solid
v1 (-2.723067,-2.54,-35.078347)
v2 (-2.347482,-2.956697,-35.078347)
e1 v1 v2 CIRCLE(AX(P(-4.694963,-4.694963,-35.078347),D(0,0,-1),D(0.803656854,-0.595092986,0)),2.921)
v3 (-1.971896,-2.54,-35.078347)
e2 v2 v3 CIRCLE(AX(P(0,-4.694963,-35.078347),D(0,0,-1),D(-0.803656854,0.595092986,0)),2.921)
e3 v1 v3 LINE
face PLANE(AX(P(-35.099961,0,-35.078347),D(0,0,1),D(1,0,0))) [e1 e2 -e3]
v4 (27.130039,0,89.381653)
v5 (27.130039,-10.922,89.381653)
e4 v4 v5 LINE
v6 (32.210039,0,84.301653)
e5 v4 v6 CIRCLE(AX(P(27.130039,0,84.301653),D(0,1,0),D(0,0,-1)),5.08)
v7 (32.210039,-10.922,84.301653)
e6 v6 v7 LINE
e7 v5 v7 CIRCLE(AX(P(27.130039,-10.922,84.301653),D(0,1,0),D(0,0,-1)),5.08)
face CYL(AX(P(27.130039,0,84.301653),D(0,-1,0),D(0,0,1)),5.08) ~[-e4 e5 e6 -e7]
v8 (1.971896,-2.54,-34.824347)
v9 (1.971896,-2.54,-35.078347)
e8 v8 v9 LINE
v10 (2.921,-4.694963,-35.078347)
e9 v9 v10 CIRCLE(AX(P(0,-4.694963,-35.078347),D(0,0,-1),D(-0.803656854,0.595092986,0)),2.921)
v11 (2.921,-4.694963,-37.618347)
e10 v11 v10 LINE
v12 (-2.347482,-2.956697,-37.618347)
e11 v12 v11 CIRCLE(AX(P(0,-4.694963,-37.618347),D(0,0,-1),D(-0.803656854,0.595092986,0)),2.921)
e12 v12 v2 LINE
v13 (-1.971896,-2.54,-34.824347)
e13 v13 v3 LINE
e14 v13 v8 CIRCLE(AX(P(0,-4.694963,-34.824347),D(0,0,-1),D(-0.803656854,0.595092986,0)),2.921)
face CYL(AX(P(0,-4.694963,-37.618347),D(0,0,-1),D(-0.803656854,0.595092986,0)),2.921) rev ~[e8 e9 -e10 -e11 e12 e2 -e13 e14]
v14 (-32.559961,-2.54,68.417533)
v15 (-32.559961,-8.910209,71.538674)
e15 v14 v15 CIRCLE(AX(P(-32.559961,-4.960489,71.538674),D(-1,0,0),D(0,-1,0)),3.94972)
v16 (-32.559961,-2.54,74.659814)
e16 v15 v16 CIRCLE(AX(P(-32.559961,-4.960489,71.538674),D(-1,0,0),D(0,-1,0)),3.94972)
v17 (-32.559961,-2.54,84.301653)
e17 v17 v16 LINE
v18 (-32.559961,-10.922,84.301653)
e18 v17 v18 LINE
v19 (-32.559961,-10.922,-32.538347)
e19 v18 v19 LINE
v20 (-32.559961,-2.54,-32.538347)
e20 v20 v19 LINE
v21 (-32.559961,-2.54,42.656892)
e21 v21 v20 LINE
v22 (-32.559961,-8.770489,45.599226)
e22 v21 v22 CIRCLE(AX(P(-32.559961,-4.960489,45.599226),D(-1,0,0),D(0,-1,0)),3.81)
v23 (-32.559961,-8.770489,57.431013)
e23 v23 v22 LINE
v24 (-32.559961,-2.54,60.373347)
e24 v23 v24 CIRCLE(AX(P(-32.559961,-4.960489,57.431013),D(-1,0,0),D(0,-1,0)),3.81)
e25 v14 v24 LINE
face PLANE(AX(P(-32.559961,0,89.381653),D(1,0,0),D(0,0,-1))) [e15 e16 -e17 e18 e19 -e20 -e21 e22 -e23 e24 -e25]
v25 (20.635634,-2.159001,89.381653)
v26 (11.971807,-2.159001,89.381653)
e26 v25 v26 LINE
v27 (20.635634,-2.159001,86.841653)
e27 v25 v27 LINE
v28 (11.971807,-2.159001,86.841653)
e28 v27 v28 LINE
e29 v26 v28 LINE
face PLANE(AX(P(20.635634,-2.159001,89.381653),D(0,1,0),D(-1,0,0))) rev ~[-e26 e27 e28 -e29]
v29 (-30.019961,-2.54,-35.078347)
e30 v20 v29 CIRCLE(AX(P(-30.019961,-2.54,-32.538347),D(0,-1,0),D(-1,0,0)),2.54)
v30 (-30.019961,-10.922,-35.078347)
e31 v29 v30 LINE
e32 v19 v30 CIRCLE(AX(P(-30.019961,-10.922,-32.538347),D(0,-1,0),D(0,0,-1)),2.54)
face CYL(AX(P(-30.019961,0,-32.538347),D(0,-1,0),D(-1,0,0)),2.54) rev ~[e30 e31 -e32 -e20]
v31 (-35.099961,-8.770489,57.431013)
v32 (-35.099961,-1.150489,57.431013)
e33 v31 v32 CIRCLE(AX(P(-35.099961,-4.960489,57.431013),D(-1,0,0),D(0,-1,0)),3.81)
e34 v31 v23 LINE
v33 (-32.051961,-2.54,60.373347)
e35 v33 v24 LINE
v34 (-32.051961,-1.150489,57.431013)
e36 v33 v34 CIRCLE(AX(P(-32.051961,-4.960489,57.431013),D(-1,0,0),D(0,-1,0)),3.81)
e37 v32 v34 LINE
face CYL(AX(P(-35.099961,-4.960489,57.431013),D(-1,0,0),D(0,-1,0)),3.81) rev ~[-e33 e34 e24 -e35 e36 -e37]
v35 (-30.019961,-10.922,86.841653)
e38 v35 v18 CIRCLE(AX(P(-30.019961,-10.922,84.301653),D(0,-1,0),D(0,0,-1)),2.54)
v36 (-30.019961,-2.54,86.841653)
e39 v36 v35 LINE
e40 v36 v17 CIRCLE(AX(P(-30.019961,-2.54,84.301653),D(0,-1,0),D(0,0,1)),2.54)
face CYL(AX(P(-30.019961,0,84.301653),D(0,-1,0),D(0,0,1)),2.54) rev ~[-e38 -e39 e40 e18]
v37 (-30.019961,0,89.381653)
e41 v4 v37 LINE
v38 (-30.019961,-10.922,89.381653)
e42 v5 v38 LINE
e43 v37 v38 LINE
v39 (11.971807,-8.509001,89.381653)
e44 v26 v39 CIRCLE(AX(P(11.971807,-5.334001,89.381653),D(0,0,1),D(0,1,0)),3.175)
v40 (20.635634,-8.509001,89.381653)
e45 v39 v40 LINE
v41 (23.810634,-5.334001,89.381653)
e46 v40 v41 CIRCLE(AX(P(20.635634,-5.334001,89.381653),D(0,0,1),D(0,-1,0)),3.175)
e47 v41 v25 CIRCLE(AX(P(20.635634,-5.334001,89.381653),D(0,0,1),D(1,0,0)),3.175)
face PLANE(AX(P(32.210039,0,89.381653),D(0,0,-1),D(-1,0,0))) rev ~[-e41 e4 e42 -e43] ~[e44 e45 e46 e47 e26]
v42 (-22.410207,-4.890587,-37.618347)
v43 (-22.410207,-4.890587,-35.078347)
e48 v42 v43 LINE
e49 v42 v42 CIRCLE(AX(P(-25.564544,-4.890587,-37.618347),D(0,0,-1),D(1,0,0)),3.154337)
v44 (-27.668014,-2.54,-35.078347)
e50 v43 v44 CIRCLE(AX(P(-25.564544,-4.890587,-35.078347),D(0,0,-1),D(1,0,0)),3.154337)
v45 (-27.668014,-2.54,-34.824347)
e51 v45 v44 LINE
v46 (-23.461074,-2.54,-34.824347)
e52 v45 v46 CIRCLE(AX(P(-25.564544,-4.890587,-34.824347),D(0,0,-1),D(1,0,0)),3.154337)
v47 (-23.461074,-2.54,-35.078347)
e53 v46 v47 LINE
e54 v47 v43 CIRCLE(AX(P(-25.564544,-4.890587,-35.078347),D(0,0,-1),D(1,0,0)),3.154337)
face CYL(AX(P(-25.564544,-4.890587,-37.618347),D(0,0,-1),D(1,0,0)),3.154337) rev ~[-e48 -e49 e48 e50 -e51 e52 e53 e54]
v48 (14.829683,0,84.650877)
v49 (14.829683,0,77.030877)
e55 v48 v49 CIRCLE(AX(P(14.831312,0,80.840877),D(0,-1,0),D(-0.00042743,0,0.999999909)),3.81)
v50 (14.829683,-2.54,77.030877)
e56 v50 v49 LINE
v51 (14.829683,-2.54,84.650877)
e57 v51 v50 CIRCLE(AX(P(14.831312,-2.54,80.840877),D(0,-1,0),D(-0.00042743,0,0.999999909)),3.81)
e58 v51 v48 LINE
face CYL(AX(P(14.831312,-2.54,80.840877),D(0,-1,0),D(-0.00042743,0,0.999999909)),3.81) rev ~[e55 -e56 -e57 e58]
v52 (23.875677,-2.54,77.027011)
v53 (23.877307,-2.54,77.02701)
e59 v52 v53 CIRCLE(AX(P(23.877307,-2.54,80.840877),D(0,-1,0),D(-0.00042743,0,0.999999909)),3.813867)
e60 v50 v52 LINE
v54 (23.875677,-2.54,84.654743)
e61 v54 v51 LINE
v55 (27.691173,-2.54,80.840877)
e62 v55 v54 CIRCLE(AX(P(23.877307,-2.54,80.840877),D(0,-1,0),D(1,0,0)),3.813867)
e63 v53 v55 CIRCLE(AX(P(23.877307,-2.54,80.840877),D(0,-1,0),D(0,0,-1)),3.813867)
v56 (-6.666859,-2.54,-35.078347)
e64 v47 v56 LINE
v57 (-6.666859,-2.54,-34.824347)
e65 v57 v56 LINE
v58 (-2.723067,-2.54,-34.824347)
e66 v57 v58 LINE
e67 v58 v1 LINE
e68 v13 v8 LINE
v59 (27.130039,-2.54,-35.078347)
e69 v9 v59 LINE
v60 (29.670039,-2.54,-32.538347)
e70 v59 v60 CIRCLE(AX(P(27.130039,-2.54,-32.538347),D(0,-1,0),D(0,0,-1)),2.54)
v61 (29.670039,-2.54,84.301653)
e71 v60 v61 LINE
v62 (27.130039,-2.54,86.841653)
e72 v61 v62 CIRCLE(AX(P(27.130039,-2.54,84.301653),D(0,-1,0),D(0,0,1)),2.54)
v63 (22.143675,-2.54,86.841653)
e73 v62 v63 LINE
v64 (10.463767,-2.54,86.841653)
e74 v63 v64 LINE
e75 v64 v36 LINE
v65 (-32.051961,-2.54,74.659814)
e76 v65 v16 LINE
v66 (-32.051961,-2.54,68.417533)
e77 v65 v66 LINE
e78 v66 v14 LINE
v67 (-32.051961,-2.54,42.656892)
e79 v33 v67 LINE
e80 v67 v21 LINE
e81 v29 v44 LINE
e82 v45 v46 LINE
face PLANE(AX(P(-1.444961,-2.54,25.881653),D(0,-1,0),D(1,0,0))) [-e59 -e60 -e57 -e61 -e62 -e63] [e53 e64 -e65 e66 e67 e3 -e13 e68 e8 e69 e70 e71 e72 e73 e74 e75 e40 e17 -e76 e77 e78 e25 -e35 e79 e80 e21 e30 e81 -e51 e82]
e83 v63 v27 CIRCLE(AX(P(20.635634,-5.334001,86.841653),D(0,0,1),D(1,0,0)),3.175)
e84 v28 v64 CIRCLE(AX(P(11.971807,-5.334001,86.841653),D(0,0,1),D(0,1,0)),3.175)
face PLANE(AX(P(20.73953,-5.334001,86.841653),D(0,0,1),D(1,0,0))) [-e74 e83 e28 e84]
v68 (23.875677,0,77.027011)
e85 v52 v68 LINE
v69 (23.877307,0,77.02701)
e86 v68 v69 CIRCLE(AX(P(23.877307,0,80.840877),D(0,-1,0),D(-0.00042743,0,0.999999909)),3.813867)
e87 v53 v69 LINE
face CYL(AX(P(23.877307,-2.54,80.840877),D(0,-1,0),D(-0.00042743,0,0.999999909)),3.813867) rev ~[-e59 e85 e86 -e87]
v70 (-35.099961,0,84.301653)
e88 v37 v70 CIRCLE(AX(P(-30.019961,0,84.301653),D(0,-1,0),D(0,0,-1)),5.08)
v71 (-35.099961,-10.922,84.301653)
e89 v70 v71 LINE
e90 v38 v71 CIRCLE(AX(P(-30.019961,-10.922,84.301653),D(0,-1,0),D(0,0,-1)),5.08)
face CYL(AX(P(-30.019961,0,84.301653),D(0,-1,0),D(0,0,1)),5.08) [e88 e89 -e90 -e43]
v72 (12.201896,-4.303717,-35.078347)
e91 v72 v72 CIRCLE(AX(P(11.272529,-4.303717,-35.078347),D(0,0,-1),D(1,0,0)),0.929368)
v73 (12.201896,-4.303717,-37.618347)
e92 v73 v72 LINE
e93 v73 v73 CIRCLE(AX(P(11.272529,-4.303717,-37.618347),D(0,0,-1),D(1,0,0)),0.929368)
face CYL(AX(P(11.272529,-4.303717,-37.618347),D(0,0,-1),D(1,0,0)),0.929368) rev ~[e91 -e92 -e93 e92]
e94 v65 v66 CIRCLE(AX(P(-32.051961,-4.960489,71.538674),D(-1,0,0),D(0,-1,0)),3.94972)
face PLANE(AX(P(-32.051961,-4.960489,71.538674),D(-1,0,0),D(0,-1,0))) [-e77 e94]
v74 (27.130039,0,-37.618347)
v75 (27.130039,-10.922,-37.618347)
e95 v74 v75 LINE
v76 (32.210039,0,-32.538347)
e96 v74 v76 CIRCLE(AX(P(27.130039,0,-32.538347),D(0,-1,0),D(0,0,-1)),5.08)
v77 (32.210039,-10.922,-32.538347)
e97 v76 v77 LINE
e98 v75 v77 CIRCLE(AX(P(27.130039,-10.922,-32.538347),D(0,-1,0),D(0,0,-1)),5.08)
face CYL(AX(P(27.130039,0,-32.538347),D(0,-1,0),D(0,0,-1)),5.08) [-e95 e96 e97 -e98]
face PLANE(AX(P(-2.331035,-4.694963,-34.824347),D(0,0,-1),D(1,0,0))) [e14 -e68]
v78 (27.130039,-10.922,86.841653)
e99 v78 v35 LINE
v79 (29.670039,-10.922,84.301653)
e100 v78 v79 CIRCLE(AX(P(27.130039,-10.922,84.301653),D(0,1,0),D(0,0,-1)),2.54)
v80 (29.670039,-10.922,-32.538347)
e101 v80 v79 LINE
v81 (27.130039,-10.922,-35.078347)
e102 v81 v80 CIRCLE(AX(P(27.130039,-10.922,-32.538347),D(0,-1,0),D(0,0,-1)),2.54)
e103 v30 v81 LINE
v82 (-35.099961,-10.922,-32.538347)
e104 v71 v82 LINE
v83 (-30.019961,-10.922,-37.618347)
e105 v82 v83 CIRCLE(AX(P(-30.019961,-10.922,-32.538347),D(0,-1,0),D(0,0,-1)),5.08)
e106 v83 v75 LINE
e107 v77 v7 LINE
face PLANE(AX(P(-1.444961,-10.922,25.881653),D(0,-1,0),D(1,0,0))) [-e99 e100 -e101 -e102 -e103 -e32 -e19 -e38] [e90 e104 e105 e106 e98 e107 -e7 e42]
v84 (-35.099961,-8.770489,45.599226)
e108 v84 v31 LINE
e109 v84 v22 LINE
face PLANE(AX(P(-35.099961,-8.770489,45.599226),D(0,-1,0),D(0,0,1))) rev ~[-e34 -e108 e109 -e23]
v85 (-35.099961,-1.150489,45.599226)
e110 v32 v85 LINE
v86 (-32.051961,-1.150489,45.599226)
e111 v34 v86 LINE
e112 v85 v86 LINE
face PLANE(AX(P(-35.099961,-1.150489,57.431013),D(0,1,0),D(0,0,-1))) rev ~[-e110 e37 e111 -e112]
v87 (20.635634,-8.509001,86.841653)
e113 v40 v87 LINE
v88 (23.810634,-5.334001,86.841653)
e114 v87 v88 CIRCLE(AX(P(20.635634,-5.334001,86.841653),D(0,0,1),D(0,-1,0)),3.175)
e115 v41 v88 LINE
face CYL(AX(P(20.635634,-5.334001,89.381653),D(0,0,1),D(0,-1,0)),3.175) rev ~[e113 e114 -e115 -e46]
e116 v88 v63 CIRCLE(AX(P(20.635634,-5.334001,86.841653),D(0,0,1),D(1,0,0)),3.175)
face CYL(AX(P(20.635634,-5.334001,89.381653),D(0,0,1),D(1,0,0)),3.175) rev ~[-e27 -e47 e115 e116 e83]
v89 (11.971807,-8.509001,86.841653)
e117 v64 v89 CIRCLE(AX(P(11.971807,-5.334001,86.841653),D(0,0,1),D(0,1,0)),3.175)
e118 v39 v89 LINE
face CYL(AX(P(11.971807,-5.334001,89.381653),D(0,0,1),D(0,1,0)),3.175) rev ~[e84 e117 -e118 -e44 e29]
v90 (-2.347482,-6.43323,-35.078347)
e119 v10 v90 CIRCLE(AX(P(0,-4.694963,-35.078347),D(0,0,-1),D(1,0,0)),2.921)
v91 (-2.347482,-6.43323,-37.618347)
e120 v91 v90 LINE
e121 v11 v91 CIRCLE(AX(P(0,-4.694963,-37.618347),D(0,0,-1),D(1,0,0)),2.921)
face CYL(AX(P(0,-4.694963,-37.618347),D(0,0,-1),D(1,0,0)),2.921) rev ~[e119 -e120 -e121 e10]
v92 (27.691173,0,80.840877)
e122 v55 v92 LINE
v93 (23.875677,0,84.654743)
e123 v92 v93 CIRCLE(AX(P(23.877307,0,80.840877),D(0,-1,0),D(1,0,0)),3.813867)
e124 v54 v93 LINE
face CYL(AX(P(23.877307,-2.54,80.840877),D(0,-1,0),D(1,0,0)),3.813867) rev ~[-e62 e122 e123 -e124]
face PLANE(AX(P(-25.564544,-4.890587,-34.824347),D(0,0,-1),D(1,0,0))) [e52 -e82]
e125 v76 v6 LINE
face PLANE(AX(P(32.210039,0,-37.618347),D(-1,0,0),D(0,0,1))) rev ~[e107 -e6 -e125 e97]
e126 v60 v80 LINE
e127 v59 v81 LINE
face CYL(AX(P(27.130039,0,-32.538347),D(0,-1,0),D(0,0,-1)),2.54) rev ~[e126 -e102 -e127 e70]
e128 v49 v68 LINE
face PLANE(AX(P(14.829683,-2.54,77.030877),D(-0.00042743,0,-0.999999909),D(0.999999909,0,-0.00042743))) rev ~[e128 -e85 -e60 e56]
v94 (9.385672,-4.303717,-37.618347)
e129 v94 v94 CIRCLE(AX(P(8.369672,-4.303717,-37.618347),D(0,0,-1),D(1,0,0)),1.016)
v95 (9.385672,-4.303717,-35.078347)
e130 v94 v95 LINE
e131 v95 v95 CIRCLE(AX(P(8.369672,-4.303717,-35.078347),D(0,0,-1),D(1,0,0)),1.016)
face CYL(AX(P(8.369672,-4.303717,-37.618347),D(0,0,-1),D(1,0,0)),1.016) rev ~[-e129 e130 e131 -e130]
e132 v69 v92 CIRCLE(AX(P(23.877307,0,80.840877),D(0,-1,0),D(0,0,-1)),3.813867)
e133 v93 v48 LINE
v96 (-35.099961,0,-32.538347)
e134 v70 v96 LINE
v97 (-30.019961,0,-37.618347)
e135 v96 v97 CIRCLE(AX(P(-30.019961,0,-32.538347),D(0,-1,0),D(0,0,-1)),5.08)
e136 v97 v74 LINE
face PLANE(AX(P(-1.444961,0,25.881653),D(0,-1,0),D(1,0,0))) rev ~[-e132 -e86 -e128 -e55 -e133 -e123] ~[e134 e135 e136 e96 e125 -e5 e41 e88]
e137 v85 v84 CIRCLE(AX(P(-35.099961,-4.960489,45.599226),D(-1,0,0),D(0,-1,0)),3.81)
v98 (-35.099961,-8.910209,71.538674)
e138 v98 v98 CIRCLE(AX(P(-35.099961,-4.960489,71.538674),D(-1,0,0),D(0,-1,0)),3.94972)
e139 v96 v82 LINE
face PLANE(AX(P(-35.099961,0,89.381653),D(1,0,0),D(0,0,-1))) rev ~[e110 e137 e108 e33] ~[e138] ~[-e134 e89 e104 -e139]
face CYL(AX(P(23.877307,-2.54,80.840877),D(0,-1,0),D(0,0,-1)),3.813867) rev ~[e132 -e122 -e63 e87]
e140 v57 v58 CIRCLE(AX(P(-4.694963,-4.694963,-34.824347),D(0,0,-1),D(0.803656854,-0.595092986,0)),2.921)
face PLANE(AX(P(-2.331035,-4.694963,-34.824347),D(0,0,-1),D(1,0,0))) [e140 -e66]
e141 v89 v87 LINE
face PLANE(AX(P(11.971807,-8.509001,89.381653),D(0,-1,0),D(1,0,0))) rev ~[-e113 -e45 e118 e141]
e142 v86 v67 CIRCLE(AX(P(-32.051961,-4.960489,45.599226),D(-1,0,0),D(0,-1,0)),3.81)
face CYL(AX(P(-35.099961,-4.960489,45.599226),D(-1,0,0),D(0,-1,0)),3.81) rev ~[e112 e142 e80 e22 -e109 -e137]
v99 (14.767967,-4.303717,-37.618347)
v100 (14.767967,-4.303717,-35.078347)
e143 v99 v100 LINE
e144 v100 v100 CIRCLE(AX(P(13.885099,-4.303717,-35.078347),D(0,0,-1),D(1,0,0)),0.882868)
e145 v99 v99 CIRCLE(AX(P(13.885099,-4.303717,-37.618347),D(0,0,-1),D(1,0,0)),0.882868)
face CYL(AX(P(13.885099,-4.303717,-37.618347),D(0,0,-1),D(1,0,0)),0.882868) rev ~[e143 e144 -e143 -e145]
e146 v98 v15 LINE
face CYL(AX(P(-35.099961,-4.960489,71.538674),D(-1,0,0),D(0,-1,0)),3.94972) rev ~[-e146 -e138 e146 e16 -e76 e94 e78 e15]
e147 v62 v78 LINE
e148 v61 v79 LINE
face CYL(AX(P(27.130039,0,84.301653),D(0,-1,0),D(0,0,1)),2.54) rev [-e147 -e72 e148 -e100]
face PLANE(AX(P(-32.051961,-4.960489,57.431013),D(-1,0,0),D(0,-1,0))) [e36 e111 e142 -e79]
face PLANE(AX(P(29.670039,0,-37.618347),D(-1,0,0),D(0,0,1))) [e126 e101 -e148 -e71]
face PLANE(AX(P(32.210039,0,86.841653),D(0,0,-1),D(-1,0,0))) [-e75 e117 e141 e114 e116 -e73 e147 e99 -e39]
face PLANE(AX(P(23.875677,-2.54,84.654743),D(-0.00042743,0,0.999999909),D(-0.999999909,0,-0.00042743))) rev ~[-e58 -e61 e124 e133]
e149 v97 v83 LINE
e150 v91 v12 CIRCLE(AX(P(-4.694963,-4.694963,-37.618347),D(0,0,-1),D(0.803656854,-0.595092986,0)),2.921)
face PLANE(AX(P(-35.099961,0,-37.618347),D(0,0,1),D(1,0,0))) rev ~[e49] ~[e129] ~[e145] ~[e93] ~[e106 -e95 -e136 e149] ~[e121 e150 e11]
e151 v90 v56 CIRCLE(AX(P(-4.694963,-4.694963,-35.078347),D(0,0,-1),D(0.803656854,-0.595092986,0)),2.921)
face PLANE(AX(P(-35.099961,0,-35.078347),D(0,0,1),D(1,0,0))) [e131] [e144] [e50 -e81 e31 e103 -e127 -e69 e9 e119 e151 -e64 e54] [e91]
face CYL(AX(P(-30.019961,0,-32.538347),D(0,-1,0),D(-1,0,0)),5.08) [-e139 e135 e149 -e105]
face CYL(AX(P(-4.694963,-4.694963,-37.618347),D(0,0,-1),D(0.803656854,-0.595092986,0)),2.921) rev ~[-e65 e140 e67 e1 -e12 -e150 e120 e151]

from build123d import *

# Parameters (mm, degrees)
F1_DEPTH  = 10.922
F2_R      = 5.08
F3_T      = -2.54
F5_R      = 0.8828675693
F5_R_2    = 0.9293675191
F5_R_3    = 1.016
F5_R_4    = 3.1543371167
F6_DEPTH  = 2.794
F7_R      = 3.9497200101
F8_DEPTH  = 3.048
F10_DEPTH = 2.54
F11_DEPTH = 25.4
F12_DEPTH = 42.418
F13_DEPTH = 25.4
F14_DEPTH = 2.54


# Not quite as in the source:
# - ends of sketch curves that miss each other by under 0.0002 mm in the source are joined


with BuildPart() as f1:
    # F0 (on Front) → F1 (new body)
    with BuildSketch(Plane.XZ):
        Polygon((32.2100387361, 89.3816531977), (0, 89.3816531977), (-35.0999612639, 89.3816531977), (-35.0999612639, -37.6183468023), (32.2100387361, -37.6183468023), align=None)
    extrude(amount=F1_DEPTH)

    # F2
    f2_edges = [f1.edges().sort_by_distance(p)[0] for p in [
        (-35.099961, -5.461, 89.381653),
        (32.210039, -5.461, 89.381653),
        (32.210039, -5.461, -37.618347),
        (-35.099961, -5.461, -37.618347),
    ]]
    fillet(f2_edges, radius=F2_R)

    # F3
    f3_openings = [f1.faces().sort_by_distance(p)[0] for p in [
        (-1.444961, -10.922, 25.881653),
    ]]
    offset(amount=F3_T, openings=f3_openings)

    # F5 (on face) → F6 (cut)
    with BuildSketch(Plane(origin=(0, 0, -37.6183468023), x_dir=(1, 0, 0), z_dir=(0, 0, -1))):
        with Locations((13.885099197, 4.3037165888)):
            Circle(F5_R)
        with Locations((11.2725288543, 4.3037165888)):
            Circle(F5_R_2)
        with Locations((8.3696719582, 4.3037165888)):
            Circle(F5_R_3)
        with BuildLine():
            ThreePointArc((-2.3474816699, 2.9566967291), (-1.9210459872, 3.7797455945), (-1.7739633397, 4.6949633397))
            ThreePointArc((-1.7739633397, 4.6949633397), (-1.9210459872, 5.6101810849), (-2.3474816699, 6.4332299504))
            ThreePointArc((-2.3474816699, 6.4332299504), (-2.921, 4.6949633397), (-2.3474816699, 2.9566967291))
        make_face()
        with BuildLine():
            ThreePointArc((-2.3474816699, 6.4332299504), (-1.9210459872, 5.6101810849), (-1.7739633397, 4.6949633397))
            ThreePointArc((-1.7739633397, 4.6949633397), (-1.9210459872, 3.7797455945), (-2.3474816699, 2.9566967291))
            ThreePointArc((-2.3474816699, 2.9566967291), (0.9152177452, 1.9210459872), (2.921, 4.6949633397))
            ThreePointArc((2.921, 4.6949633397), (0.9152177452, 7.4688806923), (-2.3474816699, 6.4332299504))
        make_face()
        with BuildLine():
            ThreePointArc((-2.3474816699, 2.9566967291), (-2.921, 4.6949633397), (-2.3474816699, 6.4332299504))
            ThreePointArc((-2.3474816699, 6.4332299504), (-7.6159633397, 4.6949633397), (-2.3474816699, 2.9566967291))
        make_face()
        with Locations((-25.5645439029, 4.8905867152)):
            Circle(F5_R_4)
    extrude(amount=-F6_DEPTH, mode=Mode.SUBTRACT)

    # F7 (on face) → F8 (cut)
    with BuildSketch(Plane(origin=(-35.0999612639, 0, 0), x_dir=(0, -1, 0), z_dir=(-1, 0, 0))):
        with Locations((4.9604894593, 71.5386738494)):
            Circle(F7_R)
        with BuildLine():
            ThreePointArc((1.1504894593, 57.4310126755), (4.9604894593, 53.6210126755), (8.7704894593, 57.4310126755))
            ThreePointArc((8.7704894593, 57.4310126755), (4.9604894593, 61.2410126755), (1.1504894593, 57.4310126755))
        make_face()
        with BuildLine():
            Line((8.7704894593, 45.599225808), (8.7704894593, 57.4310126755))
            ThreePointArc((8.7704894593, 57.4310126755), (4.9604894593, 53.6210126755), (1.1504894593, 57.4310126755))
            Line((1.1504894593, 57.4310126755), (1.1504894593, 45.599225808))
            ThreePointArc((1.1504894593, 45.599225808), (4.9604894593, 49.409225808), (8.7704894593, 45.599225808))
        make_face()
        with BuildLine():
            ThreePointArc((1.1504894593, 45.599225808), (4.9604894593, 41.789225808), (8.7704894593, 45.599225808))
            ThreePointArc((8.7704894593, 45.599225808), (4.9604894593, 49.409225808), (1.1504894593, 45.599225808))
        make_face()
    extrude(amount=-F8_DEPTH, mode=Mode.SUBTRACT)

    # F9 (on face) → F10 (cut)
    with BuildSketch(Plane.XY.offset(89.3816531977)):
        with BuildLine():
            ThreePointArc((20.6356343466, -8.5090005688), (22.8806983769, -7.5790645991), (23.8106343466, -5.3340005688))
            ThreePointArc((23.8106343466, -5.3340005688), (22.8806983769, -3.0889365386), (20.6356343466, -2.1590005688))
            ThreePointArc((20.6356343466, -2.1590005688), (17.4606343466, -5.3340005688), (20.6356343466, -8.5090005688))
        make_face()
        with BuildLine():
            ThreePointArc((20.6356343466, -8.5090005688), (17.4606343466, -5.3340005688), (20.6356343466, -2.1590005688))
            Line((20.6356343466, -2.1590005688), (11.9718069021, -2.1590005688))
            ThreePointArc((11.9718069021, -2.1590005688), (14.2168709324, -3.0889365386), (15.1468069021, -5.3340005688))
            ThreePointArc((15.1468069021, -5.3340005688), (14.2168709324, -7.5790645991), (11.9718069021, -8.5090005688))
            Line((11.9718069021, -8.5090005688), (20.6356343466, -8.5090005688))
        make_face()
        with BuildLine():
            ThreePointArc((15.1468069021, -5.3340005688), (14.2168709324, -3.0889365386), (11.9718069021, -2.1590005688))
            ThreePointArc((11.9718069021, -2.1590005688), (8.7968069021, -5.3340005688), (11.9718069021, -8.5090005688))
            ThreePointArc((11.9718069021, -8.5090005688), (14.2168709324, -7.5790645991), (15.1468069021, -5.3340005688))
        make_face()
    extrude(amount=-F10_DEPTH, mode=Mode.SUBTRACT)

    # F4 (on face) → F11 (join)
    with BuildSketch(Plane.XZ.offset(2.54)):
        with BuildLine():
            ThreePointArc((14.8296833566, 77.0308773467), (17.524812874, 78.1462244598), (18.6413118633, 80.8408769987))
            ThreePointArc((18.6413118633, 80.8408769987), (17.524812874, 83.5355295376), (14.8296833566, 84.6508766507))
            ThreePointArc((14.8296833566, 84.6508766507), (11.0213118633, 80.8408769987), (14.8296833566, 77.0308773467))
        make_face()
        with BuildLine():
            ThreePointArc((23.875676609, 84.6547431762), (20.0634403296, 80.840061919), (23.8773067684, 77.0270104728))
            ThreePointArc((23.8773067684, 77.0270104728), (26.5741176514, 78.1440661157), (27.6911732943, 80.8408769987))
            ThreePointArc((27.6911732943, 80.8408769987), (26.5735412414, 83.5382641685), (23.875676609, 84.6547431762))
        make_face()
        with BuildLine():
            ThreePointArc((14.8296833566, 84.6508766507), (17.524812874, 83.5355295376), (18.6413118633, 80.8408769987))
            ThreePointArc((18.6413118633, 80.8408769987), (17.524812874, 78.1462244598), (14.8296833566, 77.0308773467))
            Line((14.8296833566, 77.0308773467), (23.8773067684, 77.0270101244))
            ThreePointArc((23.8773067684, 77.0270101244), (20.0634403296, 80.840061919), (23.875676609, 84.6547431762))
            Line((23.875676609, 84.6547431762), (14.8296833566, 84.6508766507))
        make_face()
    extrude(amount=F11_DEPTH)

    # F4 (on face) → F12 (cut)
    with BuildSketch(Plane.XZ.offset(2.54)):
        with BuildLine():
            ThreePointArc((14.8296833566, 77.0308773467), (17.524812874, 78.1462244598), (18.6413118633, 80.8408769987))
            ThreePointArc((18.6413118633, 80.8408769987), (17.524812874, 83.5355295376), (14.8296833566, 84.6508766507))
            ThreePointArc((14.8296833566, 84.6508766507), (11.0213118633, 80.8408769987), (14.8296833566, 77.0308773467))
        make_face()
        with BuildLine():
            ThreePointArc((23.875676609, 84.6547431762), (20.0634403296, 80.840061919), (23.8773067684, 77.0270104728))
            ThreePointArc((23.8773067684, 77.0270104728), (26.5741176514, 78.1440661157), (27.6911732943, 80.8408769987))
            ThreePointArc((27.6911732943, 80.8408769987), (26.5735412414, 83.5382641685), (23.875676609, 84.6547431762))
        make_face()
        with BuildLine():
            ThreePointArc((14.8296833566, 84.6508766507), (17.524812874, 83.5355295376), (18.6413118633, 80.8408769987))
            ThreePointArc((18.6413118633, 80.8408769987), (17.524812874, 78.1462244598), (14.8296833566, 77.0308773467))
            Line((14.8296833566, 77.0308773467), (23.8773067684, 77.0270101244))
            ThreePointArc((23.8773067684, 77.0270101244), (20.0634403296, 80.840061919), (23.875676609, 84.6547431762))
            Line((23.875676609, 84.6547431762), (14.8296833566, 84.6508766507))
        make_face()
    extrude(amount=F12_DEPTH, mode=Mode.SUBTRACT)

    # F4 (on face) → F13 (cut)
    with BuildSketch(Plane.XZ.offset(2.54)):
        with BuildLine():
            ThreePointArc((14.8296833566, 77.0308773467), (17.524812874, 78.1462244598), (18.6413118633, 80.8408769987))
            ThreePointArc((18.6413118633, 80.8408769987), (17.524812874, 83.5355295376), (14.8296833566, 84.6508766507))
            ThreePointArc((14.8296833566, 84.6508766507), (11.0213118633, 80.8408769987), (14.8296833566, 77.0308773467))
        make_face()
        with BuildLine():
            ThreePointArc((23.875676609, 84.6547431762), (20.0634403296, 80.840061919), (23.8773067684, 77.0270104728))
            ThreePointArc((23.8773067684, 77.0270104728), (26.5741176514, 78.1440661157), (27.6911732943, 80.8408769987))
            ThreePointArc((27.6911732943, 80.8408769987), (26.5735412414, 83.5382641685), (23.875676609, 84.6547431762))
        make_face()
        with BuildLine():
            ThreePointArc((14.8296833566, 84.6508766507), (17.524812874, 83.5355295376), (18.6413118633, 80.8408769987))
            ThreePointArc((18.6413118633, 80.8408769987), (17.524812874, 78.1462244598), (14.8296833566, 77.0308773467))
            Line((14.8296833566, 77.0308773467), (23.8773067684, 77.0270101244))
            ThreePointArc((23.8773067684, 77.0270101244), (20.0634403296, 80.840061919), (23.875676609, 84.6547431762))
            Line((23.875676609, 84.6547431762), (14.8296833566, 84.6508766507))
        make_face()
    extrude(amount=-F13_DEPTH, mode=Mode.SUBTRACT)

    # F9 (on face) → F14 (cut)
    with BuildSketch(Plane.XY.offset(89.3816531977)):
        with BuildLine():
            ThreePointArc((20.6356343466, -8.5090005688), (22.8806983769, -7.5790645991), (23.8106343466, -5.3340005688))
            ThreePointArc((23.8106343466, -5.3340005688), (22.8806983769, -3.0889365386), (20.6356343466, -2.1590005688))
            ThreePointArc((20.6356343466, -2.1590005688), (17.4606343466, -5.3340005688), (20.6356343466, -8.5090005688))
        make_face()
        with BuildLine():
            ThreePointArc((20.6356343466, -8.5090005688), (17.4606343466, -5.3340005688), (20.6356343466, -2.1590005688))
            Line((20.6356343466, -2.1590005688), (11.9718069021, -2.1590005688))
            ThreePointArc((11.9718069021, -2.1590005688), (14.2168709324, -3.0889365386), (15.1468069021, -5.3340005688))
            ThreePointArc((15.1468069021, -5.3340005688), (14.2168709324, -7.5790645991), (11.9718069021, -8.5090005688))
            Line((11.9718069021, -8.5090005688), (20.6356343466, -8.5090005688))
        make_face()
        with BuildLine():
            ThreePointArc((15.1468069021, -5.3340005688), (14.2168709324, -3.0889365386), (11.9718069021, -2.1590005688))
            ThreePointArc((11.9718069021, -2.1590005688), (8.7968069021, -5.3340005688), (11.9718069021, -8.5090005688))
            ThreePointArc((11.9718069021, -8.5090005688), (14.2168709324, -7.5790645991), (15.1468069021, -5.3340005688))
        make_face()
    extrude(amount=-F14_DEPTH, mode=Mode.SUBTRACT)


solid = f1.part
